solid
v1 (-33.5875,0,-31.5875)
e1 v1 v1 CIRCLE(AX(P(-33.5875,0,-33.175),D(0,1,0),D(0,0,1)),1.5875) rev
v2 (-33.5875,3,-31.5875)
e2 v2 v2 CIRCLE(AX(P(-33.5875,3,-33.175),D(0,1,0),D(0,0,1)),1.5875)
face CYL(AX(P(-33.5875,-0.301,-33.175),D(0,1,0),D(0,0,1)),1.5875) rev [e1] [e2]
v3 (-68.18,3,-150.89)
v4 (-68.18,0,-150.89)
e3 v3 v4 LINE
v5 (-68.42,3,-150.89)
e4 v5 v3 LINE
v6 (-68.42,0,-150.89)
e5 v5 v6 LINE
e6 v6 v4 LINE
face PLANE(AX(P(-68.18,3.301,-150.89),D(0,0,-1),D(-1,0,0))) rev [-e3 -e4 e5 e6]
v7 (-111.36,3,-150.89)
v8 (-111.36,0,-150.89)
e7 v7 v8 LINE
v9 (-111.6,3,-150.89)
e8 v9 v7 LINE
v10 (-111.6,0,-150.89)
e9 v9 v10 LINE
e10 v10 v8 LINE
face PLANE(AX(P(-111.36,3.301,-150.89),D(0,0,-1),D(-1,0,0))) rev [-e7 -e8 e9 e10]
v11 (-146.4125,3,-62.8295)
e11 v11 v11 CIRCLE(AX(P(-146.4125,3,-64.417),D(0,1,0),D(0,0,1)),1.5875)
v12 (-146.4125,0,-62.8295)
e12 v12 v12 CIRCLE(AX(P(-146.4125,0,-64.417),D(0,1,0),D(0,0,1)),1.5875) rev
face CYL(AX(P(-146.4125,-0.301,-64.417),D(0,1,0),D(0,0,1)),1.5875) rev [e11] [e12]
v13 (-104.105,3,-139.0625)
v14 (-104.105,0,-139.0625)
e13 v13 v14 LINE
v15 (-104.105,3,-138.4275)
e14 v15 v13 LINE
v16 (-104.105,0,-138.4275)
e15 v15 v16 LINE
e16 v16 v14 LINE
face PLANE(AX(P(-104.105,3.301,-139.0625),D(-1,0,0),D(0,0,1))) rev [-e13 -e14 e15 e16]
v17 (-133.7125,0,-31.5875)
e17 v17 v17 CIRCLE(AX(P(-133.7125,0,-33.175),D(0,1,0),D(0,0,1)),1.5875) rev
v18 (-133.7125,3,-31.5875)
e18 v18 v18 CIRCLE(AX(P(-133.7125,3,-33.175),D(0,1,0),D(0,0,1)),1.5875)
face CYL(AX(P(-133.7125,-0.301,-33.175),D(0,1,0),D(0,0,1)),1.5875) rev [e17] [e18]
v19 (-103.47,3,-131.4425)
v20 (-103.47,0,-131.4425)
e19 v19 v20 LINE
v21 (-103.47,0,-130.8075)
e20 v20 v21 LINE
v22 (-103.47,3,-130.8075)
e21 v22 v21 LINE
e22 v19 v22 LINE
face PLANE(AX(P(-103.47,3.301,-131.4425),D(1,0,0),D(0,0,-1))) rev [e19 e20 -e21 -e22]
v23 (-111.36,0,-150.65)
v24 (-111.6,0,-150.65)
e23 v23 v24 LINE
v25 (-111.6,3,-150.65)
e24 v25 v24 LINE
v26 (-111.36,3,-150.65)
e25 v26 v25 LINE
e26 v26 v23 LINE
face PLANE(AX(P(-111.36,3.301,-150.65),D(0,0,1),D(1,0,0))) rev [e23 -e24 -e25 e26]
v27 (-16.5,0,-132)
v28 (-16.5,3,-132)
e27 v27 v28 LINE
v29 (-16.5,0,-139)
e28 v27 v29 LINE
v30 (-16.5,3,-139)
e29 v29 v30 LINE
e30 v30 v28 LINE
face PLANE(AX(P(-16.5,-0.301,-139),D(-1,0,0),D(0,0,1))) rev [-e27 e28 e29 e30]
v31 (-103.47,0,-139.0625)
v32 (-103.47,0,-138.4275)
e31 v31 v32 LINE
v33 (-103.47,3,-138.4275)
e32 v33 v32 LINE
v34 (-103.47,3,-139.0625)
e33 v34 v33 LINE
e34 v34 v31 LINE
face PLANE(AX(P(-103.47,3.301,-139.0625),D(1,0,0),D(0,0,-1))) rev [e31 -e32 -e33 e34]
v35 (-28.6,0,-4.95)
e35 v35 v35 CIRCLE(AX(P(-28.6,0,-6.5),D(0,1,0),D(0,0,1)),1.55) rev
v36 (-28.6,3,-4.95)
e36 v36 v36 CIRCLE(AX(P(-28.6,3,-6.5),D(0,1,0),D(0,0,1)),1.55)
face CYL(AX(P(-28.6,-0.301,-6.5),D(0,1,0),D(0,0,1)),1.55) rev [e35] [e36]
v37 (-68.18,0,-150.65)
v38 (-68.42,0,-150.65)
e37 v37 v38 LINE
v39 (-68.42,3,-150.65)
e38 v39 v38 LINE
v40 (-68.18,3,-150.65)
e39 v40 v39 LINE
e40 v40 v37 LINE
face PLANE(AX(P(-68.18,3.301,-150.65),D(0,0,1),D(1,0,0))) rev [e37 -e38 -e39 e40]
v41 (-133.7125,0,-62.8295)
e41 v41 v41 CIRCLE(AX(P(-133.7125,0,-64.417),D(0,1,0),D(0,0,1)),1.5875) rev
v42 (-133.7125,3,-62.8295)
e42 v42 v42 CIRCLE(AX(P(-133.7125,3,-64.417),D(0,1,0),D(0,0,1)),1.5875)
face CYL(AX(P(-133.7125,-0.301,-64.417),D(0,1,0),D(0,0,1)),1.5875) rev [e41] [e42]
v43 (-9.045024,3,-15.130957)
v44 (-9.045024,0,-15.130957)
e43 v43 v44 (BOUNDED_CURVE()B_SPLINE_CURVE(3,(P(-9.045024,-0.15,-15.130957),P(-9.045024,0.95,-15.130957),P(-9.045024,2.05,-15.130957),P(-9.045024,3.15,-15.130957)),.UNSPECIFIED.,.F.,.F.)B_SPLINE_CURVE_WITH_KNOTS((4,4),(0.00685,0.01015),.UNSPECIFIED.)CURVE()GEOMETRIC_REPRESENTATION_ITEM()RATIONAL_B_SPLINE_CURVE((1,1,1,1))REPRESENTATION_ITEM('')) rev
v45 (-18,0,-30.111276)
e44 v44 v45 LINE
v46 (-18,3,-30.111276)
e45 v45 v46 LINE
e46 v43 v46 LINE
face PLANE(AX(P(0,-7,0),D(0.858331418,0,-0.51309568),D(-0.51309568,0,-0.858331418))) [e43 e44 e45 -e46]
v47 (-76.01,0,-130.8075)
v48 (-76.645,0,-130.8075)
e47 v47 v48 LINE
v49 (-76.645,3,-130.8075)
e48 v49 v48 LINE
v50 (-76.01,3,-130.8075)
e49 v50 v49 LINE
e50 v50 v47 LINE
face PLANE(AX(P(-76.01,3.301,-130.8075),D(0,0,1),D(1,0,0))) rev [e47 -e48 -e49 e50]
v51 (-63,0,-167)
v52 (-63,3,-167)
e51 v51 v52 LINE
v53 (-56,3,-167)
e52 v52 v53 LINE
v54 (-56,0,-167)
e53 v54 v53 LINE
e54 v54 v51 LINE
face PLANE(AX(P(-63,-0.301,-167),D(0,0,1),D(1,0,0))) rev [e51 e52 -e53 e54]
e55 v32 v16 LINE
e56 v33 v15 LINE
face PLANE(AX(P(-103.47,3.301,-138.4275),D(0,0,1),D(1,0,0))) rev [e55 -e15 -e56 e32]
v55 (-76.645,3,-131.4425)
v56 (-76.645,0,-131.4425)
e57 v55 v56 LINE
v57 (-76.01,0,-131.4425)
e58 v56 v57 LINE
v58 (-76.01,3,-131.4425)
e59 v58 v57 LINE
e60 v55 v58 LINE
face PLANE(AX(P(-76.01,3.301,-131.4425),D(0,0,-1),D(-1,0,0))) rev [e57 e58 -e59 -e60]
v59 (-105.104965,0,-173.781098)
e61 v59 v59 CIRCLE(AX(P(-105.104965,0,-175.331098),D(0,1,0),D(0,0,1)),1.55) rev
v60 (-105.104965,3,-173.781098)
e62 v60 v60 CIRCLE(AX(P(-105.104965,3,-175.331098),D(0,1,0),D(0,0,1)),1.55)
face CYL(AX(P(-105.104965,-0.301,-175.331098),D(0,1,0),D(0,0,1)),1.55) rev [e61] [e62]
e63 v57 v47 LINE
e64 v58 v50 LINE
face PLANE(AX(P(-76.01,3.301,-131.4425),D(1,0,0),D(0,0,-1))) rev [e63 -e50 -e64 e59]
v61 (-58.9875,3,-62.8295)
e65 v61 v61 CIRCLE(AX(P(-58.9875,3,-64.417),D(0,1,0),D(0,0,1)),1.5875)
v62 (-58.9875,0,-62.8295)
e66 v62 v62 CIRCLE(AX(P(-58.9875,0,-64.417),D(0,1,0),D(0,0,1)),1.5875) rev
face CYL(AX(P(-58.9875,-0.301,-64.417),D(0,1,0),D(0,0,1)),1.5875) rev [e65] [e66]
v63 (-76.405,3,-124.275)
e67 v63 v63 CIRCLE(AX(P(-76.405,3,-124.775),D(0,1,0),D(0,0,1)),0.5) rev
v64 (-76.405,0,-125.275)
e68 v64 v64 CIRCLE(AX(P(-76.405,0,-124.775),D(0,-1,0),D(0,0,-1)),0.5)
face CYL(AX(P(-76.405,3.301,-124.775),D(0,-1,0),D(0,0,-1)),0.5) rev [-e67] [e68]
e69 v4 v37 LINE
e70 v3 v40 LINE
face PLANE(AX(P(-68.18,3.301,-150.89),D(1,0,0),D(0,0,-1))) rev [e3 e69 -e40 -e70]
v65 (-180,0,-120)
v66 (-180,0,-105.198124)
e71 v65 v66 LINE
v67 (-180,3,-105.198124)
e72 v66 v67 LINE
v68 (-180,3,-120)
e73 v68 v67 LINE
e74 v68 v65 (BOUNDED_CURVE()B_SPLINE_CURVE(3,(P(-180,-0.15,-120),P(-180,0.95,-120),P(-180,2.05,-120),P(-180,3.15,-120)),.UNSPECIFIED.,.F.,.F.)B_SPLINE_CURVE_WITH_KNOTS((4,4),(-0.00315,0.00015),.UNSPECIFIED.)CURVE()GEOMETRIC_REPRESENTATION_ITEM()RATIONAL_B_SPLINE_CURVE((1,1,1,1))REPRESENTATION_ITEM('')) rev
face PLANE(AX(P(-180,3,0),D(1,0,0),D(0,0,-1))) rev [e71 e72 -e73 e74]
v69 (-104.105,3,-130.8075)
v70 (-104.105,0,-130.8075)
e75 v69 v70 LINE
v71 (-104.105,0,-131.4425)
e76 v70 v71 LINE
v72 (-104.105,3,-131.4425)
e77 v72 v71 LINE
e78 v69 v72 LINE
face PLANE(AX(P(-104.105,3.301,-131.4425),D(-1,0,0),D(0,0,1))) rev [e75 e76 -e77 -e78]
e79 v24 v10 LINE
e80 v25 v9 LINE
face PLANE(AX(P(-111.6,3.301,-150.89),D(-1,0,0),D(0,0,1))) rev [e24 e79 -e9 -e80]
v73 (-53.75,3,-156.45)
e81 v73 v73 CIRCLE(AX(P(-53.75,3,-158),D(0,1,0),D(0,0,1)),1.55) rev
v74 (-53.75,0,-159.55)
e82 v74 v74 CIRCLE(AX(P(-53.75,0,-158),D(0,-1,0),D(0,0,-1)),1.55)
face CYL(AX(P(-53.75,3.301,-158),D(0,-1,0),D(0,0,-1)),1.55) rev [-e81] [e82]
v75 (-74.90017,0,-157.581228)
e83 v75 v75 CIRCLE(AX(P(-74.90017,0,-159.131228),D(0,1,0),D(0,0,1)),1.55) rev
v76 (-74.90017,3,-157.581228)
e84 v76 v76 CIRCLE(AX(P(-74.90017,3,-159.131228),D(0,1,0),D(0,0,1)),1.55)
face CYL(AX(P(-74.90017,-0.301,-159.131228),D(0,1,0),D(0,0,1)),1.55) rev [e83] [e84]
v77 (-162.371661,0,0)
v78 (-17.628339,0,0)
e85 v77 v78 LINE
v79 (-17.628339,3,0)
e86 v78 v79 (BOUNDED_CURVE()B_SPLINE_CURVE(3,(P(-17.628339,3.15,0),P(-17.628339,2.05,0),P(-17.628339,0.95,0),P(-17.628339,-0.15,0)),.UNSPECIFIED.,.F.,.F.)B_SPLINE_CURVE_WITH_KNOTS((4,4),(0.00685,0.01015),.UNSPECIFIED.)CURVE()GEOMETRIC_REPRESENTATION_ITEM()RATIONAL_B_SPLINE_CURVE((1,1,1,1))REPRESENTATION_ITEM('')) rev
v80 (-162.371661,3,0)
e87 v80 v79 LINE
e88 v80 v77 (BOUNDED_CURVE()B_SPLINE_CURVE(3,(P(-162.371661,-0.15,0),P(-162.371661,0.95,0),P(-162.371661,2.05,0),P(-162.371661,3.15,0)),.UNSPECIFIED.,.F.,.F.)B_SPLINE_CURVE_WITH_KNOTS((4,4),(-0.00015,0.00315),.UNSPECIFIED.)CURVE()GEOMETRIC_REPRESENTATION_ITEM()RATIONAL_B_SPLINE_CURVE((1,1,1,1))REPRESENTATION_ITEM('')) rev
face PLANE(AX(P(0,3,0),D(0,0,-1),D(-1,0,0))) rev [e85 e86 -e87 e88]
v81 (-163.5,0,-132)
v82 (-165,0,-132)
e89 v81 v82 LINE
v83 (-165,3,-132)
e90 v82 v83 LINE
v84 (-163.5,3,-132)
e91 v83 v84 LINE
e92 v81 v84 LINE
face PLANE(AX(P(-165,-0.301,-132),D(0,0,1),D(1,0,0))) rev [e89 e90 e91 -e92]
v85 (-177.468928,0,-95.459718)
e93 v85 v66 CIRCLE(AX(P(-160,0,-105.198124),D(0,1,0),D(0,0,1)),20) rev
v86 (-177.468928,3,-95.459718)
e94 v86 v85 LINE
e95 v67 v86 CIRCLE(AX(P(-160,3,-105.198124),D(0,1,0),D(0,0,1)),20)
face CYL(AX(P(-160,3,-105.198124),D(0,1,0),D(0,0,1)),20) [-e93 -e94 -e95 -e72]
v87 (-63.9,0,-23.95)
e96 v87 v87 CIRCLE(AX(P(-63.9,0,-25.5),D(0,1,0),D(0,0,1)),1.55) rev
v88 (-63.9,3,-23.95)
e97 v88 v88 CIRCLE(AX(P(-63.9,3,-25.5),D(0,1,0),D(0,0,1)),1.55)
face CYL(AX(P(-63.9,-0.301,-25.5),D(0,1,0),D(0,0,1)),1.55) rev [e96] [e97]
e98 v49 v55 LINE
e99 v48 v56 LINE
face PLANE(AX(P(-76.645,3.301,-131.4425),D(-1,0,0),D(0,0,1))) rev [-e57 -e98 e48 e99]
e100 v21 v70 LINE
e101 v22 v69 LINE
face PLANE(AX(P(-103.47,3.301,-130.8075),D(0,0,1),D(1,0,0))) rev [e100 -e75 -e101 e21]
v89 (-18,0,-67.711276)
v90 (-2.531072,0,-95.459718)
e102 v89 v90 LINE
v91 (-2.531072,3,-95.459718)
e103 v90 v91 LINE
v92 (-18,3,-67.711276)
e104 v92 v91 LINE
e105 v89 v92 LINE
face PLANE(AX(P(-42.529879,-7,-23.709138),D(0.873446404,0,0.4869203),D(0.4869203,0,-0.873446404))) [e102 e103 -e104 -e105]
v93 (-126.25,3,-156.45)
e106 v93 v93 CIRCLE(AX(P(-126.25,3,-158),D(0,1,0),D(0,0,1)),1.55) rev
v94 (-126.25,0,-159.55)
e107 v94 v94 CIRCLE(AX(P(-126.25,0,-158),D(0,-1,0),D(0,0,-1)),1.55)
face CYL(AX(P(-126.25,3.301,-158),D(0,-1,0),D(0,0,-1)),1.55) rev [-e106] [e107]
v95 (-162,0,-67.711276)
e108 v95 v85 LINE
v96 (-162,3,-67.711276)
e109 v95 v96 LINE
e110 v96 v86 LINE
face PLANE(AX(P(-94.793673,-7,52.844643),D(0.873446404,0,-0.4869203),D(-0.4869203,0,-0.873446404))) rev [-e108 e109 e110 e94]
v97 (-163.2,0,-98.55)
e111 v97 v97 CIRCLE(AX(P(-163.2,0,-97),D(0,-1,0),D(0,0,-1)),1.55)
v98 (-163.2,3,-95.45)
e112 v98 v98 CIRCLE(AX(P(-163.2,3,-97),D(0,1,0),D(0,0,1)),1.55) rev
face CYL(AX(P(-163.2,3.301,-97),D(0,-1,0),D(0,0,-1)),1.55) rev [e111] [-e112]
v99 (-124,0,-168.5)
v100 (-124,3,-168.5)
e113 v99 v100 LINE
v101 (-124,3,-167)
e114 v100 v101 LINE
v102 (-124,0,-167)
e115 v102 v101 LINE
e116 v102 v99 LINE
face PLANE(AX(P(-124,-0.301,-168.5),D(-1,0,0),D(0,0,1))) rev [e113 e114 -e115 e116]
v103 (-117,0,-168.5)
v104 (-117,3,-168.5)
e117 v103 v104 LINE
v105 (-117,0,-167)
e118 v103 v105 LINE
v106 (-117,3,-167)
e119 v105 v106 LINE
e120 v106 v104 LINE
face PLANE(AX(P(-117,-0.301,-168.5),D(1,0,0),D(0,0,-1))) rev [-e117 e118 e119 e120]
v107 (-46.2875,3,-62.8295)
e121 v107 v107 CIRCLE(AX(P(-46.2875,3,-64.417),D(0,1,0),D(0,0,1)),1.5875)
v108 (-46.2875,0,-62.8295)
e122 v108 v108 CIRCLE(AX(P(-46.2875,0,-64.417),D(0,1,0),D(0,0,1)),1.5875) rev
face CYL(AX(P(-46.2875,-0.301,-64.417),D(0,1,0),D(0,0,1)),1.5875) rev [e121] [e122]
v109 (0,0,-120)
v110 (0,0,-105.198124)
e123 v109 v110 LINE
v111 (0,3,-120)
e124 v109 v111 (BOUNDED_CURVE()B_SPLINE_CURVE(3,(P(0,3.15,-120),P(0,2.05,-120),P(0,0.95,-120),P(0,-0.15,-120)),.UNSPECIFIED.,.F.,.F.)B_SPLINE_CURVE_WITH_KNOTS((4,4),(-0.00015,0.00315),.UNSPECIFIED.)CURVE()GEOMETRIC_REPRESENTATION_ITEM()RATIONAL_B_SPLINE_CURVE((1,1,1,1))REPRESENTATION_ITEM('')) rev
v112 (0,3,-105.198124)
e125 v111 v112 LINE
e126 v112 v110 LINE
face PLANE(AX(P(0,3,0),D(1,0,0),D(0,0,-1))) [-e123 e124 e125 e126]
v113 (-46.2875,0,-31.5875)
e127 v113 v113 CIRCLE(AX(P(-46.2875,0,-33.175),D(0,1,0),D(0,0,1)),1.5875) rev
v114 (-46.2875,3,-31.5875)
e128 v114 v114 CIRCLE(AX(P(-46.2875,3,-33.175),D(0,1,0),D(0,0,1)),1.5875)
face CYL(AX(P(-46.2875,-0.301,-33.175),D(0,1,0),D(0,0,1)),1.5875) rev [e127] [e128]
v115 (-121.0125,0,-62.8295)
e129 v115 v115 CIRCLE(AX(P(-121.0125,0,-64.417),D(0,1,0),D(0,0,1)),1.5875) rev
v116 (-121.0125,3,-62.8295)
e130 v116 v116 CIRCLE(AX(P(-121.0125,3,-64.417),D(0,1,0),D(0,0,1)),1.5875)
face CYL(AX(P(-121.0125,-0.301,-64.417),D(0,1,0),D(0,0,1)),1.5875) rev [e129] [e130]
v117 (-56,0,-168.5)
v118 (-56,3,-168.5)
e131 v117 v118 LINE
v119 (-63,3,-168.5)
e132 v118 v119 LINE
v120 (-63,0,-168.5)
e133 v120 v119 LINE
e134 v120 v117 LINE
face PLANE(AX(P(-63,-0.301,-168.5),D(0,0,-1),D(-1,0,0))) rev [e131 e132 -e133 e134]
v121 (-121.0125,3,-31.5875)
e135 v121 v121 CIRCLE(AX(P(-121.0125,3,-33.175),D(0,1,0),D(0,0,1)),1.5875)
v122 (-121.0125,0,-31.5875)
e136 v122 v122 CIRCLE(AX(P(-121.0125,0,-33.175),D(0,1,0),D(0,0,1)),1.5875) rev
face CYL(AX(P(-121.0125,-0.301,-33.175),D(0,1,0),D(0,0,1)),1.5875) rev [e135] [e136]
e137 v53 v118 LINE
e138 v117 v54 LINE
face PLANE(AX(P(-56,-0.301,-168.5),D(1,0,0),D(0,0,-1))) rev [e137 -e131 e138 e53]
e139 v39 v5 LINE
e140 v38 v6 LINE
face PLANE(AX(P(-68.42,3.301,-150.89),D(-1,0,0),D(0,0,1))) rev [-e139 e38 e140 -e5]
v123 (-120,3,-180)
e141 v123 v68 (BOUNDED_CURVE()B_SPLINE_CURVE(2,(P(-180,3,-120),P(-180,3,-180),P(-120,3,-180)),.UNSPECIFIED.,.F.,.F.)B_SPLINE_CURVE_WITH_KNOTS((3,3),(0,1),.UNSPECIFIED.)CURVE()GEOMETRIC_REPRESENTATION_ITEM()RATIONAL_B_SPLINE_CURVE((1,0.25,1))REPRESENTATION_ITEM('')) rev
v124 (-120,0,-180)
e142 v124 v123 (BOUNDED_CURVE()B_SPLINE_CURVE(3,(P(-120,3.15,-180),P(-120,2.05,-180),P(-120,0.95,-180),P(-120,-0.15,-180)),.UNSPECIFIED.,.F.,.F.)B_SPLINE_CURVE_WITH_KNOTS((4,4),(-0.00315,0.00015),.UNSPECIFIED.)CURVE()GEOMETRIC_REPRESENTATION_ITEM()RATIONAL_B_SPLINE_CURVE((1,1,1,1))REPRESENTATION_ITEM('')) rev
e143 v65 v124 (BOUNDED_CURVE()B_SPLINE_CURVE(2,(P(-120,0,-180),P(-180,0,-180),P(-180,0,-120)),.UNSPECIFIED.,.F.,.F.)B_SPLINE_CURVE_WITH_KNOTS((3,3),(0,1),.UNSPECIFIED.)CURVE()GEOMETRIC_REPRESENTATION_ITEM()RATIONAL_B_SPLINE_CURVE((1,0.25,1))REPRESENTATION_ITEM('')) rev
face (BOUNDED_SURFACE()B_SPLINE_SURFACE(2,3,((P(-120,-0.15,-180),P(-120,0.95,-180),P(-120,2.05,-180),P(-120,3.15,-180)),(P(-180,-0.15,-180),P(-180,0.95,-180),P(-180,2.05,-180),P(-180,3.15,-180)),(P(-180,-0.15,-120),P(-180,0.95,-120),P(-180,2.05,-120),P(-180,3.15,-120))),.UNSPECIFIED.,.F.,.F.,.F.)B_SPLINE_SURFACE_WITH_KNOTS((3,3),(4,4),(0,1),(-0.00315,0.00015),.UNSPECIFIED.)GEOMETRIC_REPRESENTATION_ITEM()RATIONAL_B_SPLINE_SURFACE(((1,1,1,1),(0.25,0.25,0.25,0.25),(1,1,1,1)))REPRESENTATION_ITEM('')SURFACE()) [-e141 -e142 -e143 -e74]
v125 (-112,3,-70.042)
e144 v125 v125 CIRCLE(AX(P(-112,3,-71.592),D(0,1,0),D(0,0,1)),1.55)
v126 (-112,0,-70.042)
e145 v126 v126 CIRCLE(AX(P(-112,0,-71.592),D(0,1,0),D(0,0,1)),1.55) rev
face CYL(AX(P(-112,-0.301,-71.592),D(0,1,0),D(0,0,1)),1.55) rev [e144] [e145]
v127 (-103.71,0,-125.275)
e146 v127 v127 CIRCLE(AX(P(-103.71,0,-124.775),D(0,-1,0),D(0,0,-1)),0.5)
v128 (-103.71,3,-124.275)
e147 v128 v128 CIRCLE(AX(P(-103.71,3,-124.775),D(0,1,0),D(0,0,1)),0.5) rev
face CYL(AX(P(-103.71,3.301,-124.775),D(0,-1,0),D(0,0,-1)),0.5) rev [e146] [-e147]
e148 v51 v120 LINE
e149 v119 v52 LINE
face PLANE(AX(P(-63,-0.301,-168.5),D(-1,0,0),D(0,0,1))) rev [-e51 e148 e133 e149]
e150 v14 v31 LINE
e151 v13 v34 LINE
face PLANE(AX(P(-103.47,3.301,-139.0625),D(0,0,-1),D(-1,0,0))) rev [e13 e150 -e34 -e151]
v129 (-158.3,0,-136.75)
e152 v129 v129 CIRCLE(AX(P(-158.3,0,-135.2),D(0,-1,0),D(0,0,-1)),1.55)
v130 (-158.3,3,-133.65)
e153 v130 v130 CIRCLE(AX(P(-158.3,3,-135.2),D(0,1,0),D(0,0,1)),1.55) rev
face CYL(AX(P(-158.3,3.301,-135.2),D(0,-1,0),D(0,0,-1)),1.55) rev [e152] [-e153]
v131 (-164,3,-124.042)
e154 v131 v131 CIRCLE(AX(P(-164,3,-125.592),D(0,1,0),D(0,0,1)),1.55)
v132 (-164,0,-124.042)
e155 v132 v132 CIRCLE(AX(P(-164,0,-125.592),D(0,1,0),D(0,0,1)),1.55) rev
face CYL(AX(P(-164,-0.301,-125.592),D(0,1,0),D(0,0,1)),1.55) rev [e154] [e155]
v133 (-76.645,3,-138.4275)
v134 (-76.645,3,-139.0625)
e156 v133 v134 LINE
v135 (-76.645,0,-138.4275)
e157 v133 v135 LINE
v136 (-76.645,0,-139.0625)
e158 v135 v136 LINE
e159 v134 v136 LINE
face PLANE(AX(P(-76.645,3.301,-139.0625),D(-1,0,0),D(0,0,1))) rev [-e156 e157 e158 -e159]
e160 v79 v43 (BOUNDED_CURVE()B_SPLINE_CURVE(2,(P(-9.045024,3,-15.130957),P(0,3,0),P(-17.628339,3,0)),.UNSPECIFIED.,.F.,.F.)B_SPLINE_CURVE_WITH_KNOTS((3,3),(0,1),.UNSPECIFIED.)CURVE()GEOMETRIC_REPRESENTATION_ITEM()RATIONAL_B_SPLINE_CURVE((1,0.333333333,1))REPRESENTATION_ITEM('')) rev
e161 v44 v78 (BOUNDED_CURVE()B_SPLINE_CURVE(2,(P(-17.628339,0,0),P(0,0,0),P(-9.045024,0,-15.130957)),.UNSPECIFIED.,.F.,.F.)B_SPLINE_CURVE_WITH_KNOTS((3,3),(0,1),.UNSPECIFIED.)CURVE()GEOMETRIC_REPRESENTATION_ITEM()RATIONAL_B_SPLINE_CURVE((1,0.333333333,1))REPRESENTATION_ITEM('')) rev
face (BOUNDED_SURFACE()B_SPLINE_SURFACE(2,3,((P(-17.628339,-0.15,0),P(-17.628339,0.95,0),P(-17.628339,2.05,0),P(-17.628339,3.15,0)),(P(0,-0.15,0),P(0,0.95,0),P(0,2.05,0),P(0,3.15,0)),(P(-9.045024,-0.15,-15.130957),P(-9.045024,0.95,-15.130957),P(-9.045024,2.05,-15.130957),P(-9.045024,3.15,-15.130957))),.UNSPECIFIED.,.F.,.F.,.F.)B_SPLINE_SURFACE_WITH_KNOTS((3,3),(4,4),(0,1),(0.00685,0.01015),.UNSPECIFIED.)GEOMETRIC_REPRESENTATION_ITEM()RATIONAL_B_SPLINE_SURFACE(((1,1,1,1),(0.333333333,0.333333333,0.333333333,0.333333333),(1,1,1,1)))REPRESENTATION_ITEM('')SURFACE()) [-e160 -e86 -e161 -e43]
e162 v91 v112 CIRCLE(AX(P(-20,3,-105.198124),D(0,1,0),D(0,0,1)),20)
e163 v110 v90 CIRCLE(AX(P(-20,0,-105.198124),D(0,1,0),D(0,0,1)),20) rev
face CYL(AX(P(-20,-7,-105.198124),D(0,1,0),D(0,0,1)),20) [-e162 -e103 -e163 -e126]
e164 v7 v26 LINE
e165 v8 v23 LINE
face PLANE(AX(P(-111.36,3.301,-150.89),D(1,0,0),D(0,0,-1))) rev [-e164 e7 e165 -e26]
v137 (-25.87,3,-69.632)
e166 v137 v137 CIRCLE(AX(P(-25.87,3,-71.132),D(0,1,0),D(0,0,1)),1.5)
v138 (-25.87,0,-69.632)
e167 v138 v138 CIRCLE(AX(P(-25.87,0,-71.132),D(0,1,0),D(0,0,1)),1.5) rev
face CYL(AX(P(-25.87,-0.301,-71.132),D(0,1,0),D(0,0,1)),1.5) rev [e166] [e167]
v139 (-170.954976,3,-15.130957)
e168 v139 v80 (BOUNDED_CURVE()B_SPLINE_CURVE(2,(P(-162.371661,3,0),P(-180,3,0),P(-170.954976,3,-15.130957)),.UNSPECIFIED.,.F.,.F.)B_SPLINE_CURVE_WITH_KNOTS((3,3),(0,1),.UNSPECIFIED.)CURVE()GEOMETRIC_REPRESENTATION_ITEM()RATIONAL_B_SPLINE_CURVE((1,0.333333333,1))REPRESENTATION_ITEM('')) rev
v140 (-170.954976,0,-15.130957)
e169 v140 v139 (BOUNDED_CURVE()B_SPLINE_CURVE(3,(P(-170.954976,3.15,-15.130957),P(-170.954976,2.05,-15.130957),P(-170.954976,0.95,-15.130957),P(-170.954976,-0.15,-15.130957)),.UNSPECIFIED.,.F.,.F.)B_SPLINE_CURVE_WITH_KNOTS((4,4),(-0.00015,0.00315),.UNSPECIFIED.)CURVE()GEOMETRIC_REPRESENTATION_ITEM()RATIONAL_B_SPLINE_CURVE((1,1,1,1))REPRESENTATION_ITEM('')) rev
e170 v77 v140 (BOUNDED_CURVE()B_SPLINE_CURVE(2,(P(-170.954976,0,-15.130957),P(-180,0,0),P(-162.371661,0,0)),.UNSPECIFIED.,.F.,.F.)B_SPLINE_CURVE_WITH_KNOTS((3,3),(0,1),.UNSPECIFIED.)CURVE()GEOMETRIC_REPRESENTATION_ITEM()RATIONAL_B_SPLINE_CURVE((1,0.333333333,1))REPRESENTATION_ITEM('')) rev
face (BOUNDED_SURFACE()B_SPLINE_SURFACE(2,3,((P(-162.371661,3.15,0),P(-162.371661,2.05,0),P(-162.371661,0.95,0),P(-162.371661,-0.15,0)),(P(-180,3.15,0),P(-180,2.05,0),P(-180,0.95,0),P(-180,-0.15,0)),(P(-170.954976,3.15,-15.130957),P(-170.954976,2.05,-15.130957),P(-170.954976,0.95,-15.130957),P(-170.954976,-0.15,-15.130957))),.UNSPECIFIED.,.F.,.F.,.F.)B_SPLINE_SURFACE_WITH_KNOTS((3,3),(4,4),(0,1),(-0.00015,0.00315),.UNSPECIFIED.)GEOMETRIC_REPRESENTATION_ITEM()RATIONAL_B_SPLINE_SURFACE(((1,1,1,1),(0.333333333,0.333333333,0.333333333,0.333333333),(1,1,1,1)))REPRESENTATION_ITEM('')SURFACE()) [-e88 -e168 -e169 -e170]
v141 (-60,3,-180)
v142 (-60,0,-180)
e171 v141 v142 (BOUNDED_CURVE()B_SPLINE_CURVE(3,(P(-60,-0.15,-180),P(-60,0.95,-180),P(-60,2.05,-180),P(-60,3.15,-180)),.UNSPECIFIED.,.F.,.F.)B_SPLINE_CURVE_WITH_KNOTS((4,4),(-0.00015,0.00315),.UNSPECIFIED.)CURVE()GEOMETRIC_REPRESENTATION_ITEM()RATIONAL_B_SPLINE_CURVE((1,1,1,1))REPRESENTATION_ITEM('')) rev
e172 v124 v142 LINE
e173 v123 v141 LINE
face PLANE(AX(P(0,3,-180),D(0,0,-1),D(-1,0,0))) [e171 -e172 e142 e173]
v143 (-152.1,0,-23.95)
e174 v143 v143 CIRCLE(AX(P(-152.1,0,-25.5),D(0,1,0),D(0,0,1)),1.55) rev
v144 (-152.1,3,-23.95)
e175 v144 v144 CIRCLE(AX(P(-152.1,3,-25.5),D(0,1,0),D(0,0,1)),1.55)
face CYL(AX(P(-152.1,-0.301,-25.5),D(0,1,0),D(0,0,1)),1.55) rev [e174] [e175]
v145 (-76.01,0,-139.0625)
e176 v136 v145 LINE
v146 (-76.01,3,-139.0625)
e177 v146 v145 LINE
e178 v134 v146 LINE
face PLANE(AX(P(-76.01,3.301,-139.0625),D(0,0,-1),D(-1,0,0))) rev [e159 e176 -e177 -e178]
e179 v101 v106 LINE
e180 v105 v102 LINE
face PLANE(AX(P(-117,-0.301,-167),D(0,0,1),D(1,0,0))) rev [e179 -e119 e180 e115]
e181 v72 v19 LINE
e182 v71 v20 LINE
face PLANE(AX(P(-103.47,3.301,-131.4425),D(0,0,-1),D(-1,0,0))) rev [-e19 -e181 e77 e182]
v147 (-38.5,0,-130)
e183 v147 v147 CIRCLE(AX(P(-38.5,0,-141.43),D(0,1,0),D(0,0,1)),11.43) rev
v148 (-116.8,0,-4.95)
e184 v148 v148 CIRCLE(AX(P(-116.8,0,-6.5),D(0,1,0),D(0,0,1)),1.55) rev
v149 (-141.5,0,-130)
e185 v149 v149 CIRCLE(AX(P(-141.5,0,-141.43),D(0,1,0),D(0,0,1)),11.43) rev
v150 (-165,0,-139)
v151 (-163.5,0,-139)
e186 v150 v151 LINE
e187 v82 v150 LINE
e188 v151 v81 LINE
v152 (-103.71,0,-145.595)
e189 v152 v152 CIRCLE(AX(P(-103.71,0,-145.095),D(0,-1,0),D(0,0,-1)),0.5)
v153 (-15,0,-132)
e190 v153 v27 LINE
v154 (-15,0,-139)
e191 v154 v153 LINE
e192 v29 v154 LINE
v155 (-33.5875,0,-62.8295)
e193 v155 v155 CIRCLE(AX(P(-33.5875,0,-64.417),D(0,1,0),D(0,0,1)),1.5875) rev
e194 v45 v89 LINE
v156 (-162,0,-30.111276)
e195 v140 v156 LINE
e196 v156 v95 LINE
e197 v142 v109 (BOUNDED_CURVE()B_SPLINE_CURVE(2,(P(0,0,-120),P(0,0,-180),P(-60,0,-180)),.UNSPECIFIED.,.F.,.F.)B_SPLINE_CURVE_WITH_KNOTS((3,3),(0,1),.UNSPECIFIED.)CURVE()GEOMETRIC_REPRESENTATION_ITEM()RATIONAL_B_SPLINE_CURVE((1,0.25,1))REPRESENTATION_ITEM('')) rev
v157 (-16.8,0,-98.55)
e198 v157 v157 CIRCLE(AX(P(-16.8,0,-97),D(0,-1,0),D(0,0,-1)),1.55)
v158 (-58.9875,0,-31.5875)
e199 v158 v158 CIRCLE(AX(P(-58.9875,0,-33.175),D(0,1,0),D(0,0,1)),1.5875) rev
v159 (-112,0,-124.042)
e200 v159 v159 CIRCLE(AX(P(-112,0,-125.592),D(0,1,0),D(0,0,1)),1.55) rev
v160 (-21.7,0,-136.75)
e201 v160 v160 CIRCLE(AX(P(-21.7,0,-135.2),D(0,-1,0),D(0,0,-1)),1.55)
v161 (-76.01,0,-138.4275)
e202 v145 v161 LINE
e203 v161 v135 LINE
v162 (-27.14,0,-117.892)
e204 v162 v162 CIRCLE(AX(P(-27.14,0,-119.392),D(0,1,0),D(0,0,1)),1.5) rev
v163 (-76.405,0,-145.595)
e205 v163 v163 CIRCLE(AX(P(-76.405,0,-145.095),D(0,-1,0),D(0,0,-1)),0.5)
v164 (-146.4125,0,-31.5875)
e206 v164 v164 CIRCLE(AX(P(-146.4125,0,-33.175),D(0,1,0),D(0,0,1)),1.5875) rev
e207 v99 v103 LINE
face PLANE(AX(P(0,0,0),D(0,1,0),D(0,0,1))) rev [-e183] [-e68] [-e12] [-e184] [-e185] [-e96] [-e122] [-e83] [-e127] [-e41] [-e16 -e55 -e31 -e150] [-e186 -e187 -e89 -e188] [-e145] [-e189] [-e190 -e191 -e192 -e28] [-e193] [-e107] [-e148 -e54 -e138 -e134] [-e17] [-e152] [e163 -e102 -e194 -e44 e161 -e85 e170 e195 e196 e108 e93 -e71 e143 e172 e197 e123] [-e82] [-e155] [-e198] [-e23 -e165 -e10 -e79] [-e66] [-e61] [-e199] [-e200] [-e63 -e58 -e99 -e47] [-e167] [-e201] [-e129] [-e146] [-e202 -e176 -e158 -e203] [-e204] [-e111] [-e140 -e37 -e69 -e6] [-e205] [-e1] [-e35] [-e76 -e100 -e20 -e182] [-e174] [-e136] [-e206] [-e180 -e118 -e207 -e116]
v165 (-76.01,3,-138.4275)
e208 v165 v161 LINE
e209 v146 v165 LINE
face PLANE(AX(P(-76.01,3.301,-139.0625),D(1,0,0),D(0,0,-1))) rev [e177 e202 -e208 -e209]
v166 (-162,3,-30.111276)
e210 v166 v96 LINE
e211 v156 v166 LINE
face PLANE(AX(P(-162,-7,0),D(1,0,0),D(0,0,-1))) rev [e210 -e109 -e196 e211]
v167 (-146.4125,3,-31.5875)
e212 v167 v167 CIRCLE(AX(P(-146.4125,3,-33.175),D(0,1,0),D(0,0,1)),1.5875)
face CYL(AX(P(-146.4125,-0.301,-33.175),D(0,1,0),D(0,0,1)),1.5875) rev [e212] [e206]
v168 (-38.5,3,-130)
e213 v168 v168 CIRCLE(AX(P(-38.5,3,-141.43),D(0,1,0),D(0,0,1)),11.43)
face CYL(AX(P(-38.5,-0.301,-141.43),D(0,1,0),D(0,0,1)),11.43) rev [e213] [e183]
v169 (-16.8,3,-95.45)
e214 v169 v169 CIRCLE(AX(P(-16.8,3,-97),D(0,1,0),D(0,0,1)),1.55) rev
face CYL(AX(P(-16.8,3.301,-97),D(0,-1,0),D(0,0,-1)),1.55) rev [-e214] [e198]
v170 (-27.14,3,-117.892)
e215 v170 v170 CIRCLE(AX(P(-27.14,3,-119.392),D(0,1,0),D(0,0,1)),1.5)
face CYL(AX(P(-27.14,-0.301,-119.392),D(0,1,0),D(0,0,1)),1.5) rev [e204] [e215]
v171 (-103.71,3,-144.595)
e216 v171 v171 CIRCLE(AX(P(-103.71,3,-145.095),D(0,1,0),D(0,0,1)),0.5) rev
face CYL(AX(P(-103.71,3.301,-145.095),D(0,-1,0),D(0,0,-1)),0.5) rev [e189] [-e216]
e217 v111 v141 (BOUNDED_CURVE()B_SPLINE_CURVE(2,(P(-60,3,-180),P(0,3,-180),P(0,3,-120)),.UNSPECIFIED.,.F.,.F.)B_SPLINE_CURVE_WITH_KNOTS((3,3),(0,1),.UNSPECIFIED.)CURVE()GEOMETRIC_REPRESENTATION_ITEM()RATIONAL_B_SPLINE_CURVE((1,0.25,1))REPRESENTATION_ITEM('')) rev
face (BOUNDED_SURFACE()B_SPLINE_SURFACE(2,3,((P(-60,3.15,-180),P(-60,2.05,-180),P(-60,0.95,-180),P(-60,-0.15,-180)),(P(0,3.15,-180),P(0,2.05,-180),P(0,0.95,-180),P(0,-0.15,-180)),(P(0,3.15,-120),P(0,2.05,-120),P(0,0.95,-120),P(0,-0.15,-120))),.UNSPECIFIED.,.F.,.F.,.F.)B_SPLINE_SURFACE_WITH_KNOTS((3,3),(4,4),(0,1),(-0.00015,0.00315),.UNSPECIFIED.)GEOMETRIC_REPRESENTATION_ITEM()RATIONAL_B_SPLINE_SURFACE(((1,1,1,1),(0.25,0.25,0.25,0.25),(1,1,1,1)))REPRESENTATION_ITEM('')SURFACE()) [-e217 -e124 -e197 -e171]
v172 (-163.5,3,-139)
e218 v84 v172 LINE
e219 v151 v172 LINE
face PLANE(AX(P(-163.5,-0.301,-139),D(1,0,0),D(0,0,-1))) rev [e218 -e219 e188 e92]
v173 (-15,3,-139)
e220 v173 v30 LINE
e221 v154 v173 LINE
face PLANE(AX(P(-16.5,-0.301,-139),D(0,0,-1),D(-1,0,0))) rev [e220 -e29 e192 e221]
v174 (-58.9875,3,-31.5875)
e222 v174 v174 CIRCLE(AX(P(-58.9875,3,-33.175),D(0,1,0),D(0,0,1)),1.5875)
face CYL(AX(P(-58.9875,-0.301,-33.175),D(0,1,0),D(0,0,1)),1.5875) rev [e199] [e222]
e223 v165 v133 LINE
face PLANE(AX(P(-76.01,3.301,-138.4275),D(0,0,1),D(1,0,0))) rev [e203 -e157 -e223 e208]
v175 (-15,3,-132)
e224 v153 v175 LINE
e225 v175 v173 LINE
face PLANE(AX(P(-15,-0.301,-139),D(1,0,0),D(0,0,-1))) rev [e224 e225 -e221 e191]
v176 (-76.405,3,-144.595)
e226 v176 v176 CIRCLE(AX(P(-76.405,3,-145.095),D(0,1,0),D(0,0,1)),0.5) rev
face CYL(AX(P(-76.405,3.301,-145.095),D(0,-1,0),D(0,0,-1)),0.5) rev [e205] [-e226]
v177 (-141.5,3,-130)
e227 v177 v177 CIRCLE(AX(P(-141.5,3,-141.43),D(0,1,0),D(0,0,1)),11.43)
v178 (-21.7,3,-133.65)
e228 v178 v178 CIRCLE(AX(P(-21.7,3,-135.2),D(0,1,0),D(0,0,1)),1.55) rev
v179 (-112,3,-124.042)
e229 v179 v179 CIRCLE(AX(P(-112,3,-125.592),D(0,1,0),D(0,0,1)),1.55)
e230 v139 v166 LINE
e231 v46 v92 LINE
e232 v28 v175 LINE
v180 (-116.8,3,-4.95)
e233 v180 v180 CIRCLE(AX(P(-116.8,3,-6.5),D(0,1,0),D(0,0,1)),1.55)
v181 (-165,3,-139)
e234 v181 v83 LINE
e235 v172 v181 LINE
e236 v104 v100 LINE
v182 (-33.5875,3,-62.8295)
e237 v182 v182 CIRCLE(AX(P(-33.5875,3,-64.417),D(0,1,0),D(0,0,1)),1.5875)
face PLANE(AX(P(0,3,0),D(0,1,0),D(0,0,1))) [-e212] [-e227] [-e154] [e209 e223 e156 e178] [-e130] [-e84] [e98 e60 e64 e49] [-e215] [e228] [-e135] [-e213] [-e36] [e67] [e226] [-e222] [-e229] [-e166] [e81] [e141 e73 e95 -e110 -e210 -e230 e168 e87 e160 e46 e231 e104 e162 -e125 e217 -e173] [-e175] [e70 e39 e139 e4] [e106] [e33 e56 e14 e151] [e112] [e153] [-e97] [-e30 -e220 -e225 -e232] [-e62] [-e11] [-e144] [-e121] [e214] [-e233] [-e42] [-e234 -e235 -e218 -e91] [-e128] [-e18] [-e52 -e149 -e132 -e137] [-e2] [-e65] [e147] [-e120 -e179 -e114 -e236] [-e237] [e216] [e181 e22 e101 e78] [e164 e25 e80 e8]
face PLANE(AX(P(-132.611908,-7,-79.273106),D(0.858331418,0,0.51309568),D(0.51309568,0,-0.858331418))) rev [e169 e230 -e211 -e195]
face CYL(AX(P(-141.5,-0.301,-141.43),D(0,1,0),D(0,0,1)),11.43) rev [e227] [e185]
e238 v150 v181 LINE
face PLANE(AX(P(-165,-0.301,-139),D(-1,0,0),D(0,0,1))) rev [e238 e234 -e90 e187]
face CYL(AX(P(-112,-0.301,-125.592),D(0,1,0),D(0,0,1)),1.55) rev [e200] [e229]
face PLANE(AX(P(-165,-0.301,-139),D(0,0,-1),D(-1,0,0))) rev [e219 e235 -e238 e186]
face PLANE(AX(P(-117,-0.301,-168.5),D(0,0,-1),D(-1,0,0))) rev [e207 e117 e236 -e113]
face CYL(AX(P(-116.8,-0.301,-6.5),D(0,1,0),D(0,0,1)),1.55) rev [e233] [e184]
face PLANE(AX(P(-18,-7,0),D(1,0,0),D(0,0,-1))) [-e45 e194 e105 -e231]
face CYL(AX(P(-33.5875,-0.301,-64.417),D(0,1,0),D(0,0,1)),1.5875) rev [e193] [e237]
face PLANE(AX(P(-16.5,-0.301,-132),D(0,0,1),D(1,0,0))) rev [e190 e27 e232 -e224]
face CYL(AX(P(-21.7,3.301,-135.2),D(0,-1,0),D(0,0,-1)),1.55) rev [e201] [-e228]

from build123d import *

# Parameters (mm, degrees)
SKETCH1_W           = 80
SKETCH1_H           = 30
SKETCH1_W_2         = 50
BOSS_EXTRUDE1_DEPTH = 3
FILLET1_SIZE        = 60
SKETCH6_W           = 80
SKETCH6_H           = 30
CUT_EXTRUDE1_DEPTH  = 10
FILLET3_R           = 20
SKETCH8_R           = 1.55
SKETCH8_R_2         = 11.43
SKETCH8_R_3         = 1.5875
SKETCH8_R_4         = 1.5
SKETCH8_W           = 7
SKETCH8_H           = 1.5
SKETCH8_W_2         = 1.5
SKETCH8_H_2         = 7
CUT_EXTRUDE2_DEPTH  = 3
CUT_EXTRUDE3_REACH  = 256.576
SKETCH9_R           = 1.55
SKETCH9_R_2         = 0.5
SKETCH9_W           = 0.24
SKETCH9_H           = 0.24
SKETCH9_W_2         = 0.635
SKETCH9_H_2         = 0.635


with BuildPart() as part:
    # Sketch1 → Boss-Extrude1 (new body)
    with BuildSketch(Plane(origin=(0, 0, 0), x_dir=(1, 0, 0), z_dir=(0, 1, 0))):
        with Locations((-90, -15)):
            Rectangle(SKETCH1_W, SKETCH1_H)
        Polygon((0, 180), (-180, 180), (-180, 30), (-130, 30), (-50, 30), (0, 30), align=None)
        with Locations((-25, 15)):
            Rectangle(SKETCH1_W_2, SKETCH1_H)
        with Locations((-155, 15)):
            Rectangle(SKETCH1_W_2, SKETCH1_H)
        with Locations((-90, 15)):
            Rectangle(SKETCH1_W, SKETCH1_H)
    extrude(amount=BOSS_EXTRUDE1_DEPTH)

    # Fillet1
    # a fillet whose section is not a circle: 60 mm, written as the material it takes off along each edge
    with BuildSketch(Plane(origin=(0, -150, -180), x_dir=(0, 0, 1), z_dir=(0, 1, 0)), Plane(origin=(-180, -150, -180), x_dir=(1, 0, 0), z_dir=(0, 1, 0))) as fillet1_piece_1:
        with BuildLine():
            Bezier((FILLET1_SIZE, 0), (0, 0), (0, -FILLET1_SIZE), weights=[1, 0.25, 1])
            Line((0, -FILLET1_SIZE), (0, 0))
            Line((0, 0), (FILLET1_SIZE, 0))
        make_face()
    extrude(amount=303, mode=Mode.SUBTRACT)

    # Sketch6 → Cut-Extrude1 (cut)
    with BuildSketch(Plane(origin=(0, 3, 0), x_dir=(1, 0, 0), z_dir=(0, 1, 0))):
        with Locations((-90, -15)):
            Rectangle(SKETCH6_W, SKETCH6_H)
        Polygon((-180, 100), (-180, 0), (-162, 30.1112758), (-162, 67.7112758), align=None)
        Polygon((-18, 30.1112758), (0, 0), (0, 100), (-18, 67.7112758), align=None)
    extrude(amount=-CUT_EXTRUDE1_DEPTH, mode=Mode.SUBTRACT)

    # Fillet2
    # a fillet whose section is not a circle: 10 mm, written as the material it takes off along each edge
    with BuildSketch(Plane(origin=(-180, -44.070846291, 0), x_dir=(1, 0, 0), z_dir=(0, 1, 0)), Plane(origin=(0, -44.070846291, 0), x_dir=(-0.513095679808488, 0, -0.8583314181374613), z_dir=(0, 1, 0))) as fillet2_piece_1:
        with BuildLine():
            Bezier((17.628338516, 0), (0, 0), (9.045024335, 15.130956798), weights=[1, 0.333333333, 1])
            Line((9.045024335, 15.130956798), (0, 0))
            Line((0, 0), (17.628338516, 0))
        make_face()
    extrude(amount=91.141692581, mode=Mode.SUBTRACT)

    # Fillet3
    fillet3_edges = [part.edges().sort_by_distance(p)[0] for p in [
        (0, 1.5, -100),
        (-180, 1.5, -100),
    ]]
    fillet(fillet3_edges, radius=FILLET3_R)

    # Sketch8 → Cut-Extrude2 (cut)
    with BuildSketch(Plane(origin=(0, 3, 0), x_dir=(1, 0, 0), z_dir=(0, 1, 0))):
        with Locations(Location((-105.104964584, 175.33109831, 0), (0, 0, 270))):
            Circle(SKETCH8_R)
        with Locations(Location((-74.900170028, 159.13122779, 0), (0, 0, 270))):
            Circle(SKETCH8_R)
        with Locations(Location((-141.5, 141.43, 0), (0, 0, 270))):
            Circle(SKETCH8_R_2)
        with Locations(Location((-38.5, 141.43, 0), (0, 0, 270))):
            Circle(SKETCH8_R_2)
        with Locations(Location((-112, 125.592, 0), (0, 0, 270))):
            Circle(SKETCH8_R)
        with Locations(Location((-164, 125.592, 0), (0, 0, 270))):
            Circle(SKETCH8_R)
        with Locations(Location((-112, 71.592, 0), (0, 0, 270))):
            Circle(SKETCH8_R)
        with Locations(Location((-146.4125, 64.417, 0), (0, 0, 270))):
            Circle(SKETCH8_R_3)
        with Locations(Location((-133.7125, 64.417, 0), (0, 0, 270))):
            Circle(SKETCH8_R_3)
        with Locations(Location((-121.0125, 64.417, 0), (0, 0, 270))):
            Circle(SKETCH8_R_3)
        with Locations(Location((-146.4125, 33.175, 0), (0, 0, 270))):
            Circle(SKETCH8_R_3)
        with Locations(Location((-133.7125, 33.175, 0), (0, 0, 270))):
            Circle(SKETCH8_R_3)
        with Locations(Location((-121.0125, 33.175, 0), (0, 0, 270))):
            Circle(SKETCH8_R_3)
        with Locations(Location((-58.9875, 64.417, 0), (0, 0, 270))):
            Circle(SKETCH8_R_3)
        with Locations(Location((-46.2875, 64.417, 0), (0, 0, 270))):
            Circle(SKETCH8_R_3)
        with Locations(Location((-33.5875, 64.417, 0), (0, 0, 270))):
            Circle(SKETCH8_R_3)
        with Locations(Location((-33.5875, 33.175, 0), (0, 0, 270))):
            Circle(SKETCH8_R_3)
        with Locations(Location((-46.2875, 33.175, 0), (0, 0, 270))):
            Circle(SKETCH8_R_3)
        with Locations(Location((-58.9875, 33.175, 0), (0, 0, 270))):
            Circle(SKETCH8_R_3)
        with Locations(Location((-63.9, 25.5, 0), (0, 0, 270))):
            Circle(SKETCH8_R)
        with Locations(Location((-28.6, 6.5, 0), (0, 0, 270))):
            Circle(SKETCH8_R)
        with Locations(Location((-116.8, 6.5, 0), (0, 0, 270))):
            Circle(SKETCH8_R)
        with Locations(Location((-152.1, 25.5, 0), (0, 0, 270))):
            Circle(SKETCH8_R)
        with Locations(Location((-27.14, 119.392, 0), (0, 0, 270))):
            Circle(SKETCH8_R_4)
        with Locations(Location((-25.87, 71.132, 0), (0, 0, 270))):
            Circle(SKETCH8_R_4)
        with Locations((-59.5, 167.75)):
            Rectangle(SKETCH8_W, SKETCH8_H)
        with Locations((-120.5, 167.75)):
            Rectangle(SKETCH8_W, SKETCH8_H)
        with Locations((-164.25, 135.5)):
            Rectangle(SKETCH8_W_2, SKETCH8_H_2)
        with Locations((-15.75, 135.5)):
            Rectangle(SKETCH8_W_2, SKETCH8_H_2)
    extrude(amount=-CUT_EXTRUDE2_DEPTH, mode=Mode.SUBTRACT)

    # Sketch9 → Cut-Extrude3 (cut, up to next)
    with BuildSketch(Plane.XZ, mode=Mode.PRIVATE) as cut_extrude3_sk1:
        with Locations(Location((-163.2, -97, 0), (0, 0, 270))):
            Circle(SKETCH9_R)
    cut_extrude3_tool1 = extrude(cut_extrude3_sk1.sketch, amount=-CUT_EXTRUDE3_REACH, mode=Mode.PRIVATE) & part.part
    # Sketch9 → Cut-Extrude3 (cut, up to next)
    with BuildSketch(Plane.XZ, mode=Mode.PRIVATE) as cut_extrude3_sk2:
        with Locations(Location((-158.3, -135.2, 0), (0, 0, 270))):
            Circle(SKETCH9_R)
    cut_extrude3_tool2 = extrude(cut_extrude3_sk2.sketch, amount=-CUT_EXTRUDE3_REACH, mode=Mode.PRIVATE) & part.part
    # Sketch9 → Cut-Extrude3 (cut, up to next)
    with BuildSketch(Plane.XZ, mode=Mode.PRIVATE) as cut_extrude3_sk3:
        with Locations(Location((-126.25, -158, 0), (0, 0, 270))):
            Circle(SKETCH9_R)
    cut_extrude3_tool3 = extrude(cut_extrude3_sk3.sketch, amount=-CUT_EXTRUDE3_REACH, mode=Mode.PRIVATE) & part.part
    # Sketch9 → Cut-Extrude3 (cut, up to next)
    with BuildSketch(Plane.XZ, mode=Mode.PRIVATE) as cut_extrude3_sk4:
        with Locations(Location((-53.75, -158, 0), (0, 0, 270))):
            Circle(SKETCH9_R)
    cut_extrude3_tool4 = extrude(cut_extrude3_sk4.sketch, amount=-CUT_EXTRUDE3_REACH, mode=Mode.PRIVATE) & part.part
    # Sketch9 → Cut-Extrude3 (cut, up to next)
    with BuildSketch(Plane.XZ, mode=Mode.PRIVATE) as cut_extrude3_sk5:
        with Locations(Location((-21.7, -135.2, 0), (0, 0, 270))):
            Circle(SKETCH9_R)
    cut_extrude3_tool5 = extrude(cut_extrude3_sk5.sketch, amount=-CUT_EXTRUDE3_REACH, mode=Mode.PRIVATE) & part.part
    # Sketch9 → Cut-Extrude3 (cut, up to next)
    with BuildSketch(Plane.XZ, mode=Mode.PRIVATE) as cut_extrude3_sk6:
        with Locations(Location((-16.8, -97, 0), (0, 0, 270))):
            Circle(SKETCH9_R)
    cut_extrude3_tool6 = extrude(cut_extrude3_sk6.sketch, amount=-CUT_EXTRUDE3_REACH, mode=Mode.PRIVATE) & part.part
    # Sketch9 → Cut-Extrude3 (cut, up to next)
    with BuildSketch(Plane.XZ, mode=Mode.PRIVATE) as cut_extrude3_sk7:
        with Locations(Location((-76.405, -124.775, 0), (0, 0, 270))):
            Circle(SKETCH9_R_2)
    cut_extrude3_tool7 = extrude(cut_extrude3_sk7.sketch, amount=-CUT_EXTRUDE3_REACH, mode=Mode.PRIVATE) & part.part
    # Sketch9 → Cut-Extrude3 (cut, up to next)
    with BuildSketch(Plane.XZ, mode=Mode.PRIVATE) as cut_extrude3_sk8:
        with Locations(Location((-103.71, -145.095, 0), (0, 0, 270))):
            Circle(SKETCH9_R_2)
    cut_extrude3_tool8 = extrude(cut_extrude3_sk8.sketch, amount=-CUT_EXTRUDE3_REACH, mode=Mode.PRIVATE) & part.part
    # Sketch9 → Cut-Extrude3 (cut, up to next)
    with BuildSketch(Plane.XZ, mode=Mode.PRIVATE) as cut_extrude3_sk9:
        with Locations(Location((-76.405, -145.095, 0), (0, 0, 270))):
            Circle(SKETCH9_R_2)
    cut_extrude3_tool9 = extrude(cut_extrude3_sk9.sketch, amount=-CUT_EXTRUDE3_REACH, mode=Mode.PRIVATE) & part.part
    # Sketch9 → Cut-Extrude3 (cut, up to next)
    with BuildSketch(Plane.XZ, mode=Mode.PRIVATE) as cut_extrude3_sk10:
        with Locations(Location((-103.71, -124.775, 0), (0, 0, 270))):
            Circle(SKETCH9_R_2)
    cut_extrude3_tool10 = extrude(cut_extrude3_sk10.sketch, amount=-CUT_EXTRUDE3_REACH, mode=Mode.PRIVATE) & part.part
    # Sketch9 → Cut-Extrude3 (cut, up to next)
    with BuildSketch(Plane.XZ, mode=Mode.PRIVATE) as cut_extrude3_sk11:
        with Locations((-68.3, -150.77)):
            Rectangle(SKETCH9_W, SKETCH9_H)
    cut_extrude3_tool11 = extrude(cut_extrude3_sk11.sketch, amount=-CUT_EXTRUDE3_REACH, mode=Mode.PRIVATE) & part.part
    # Sketch9 → Cut-Extrude3 (cut, up to next)
    with BuildSketch(Plane.XZ, mode=Mode.PRIVATE) as cut_extrude3_sk12:
        with Locations((-111.48, -150.77)):
            Rectangle(SKETCH9_W, SKETCH9_H)
    cut_extrude3_tool12 = extrude(cut_extrude3_sk12.sketch, amount=-CUT_EXTRUDE3_REACH, mode=Mode.PRIVATE) & part.part
    # Sketch9 → Cut-Extrude3 (cut, up to next)
    with BuildSketch(Plane.XZ, mode=Mode.PRIVATE) as cut_extrude3_sk13:
        with Locations((-76.3275, -138.745)):
            Rectangle(SKETCH9_W_2, SKETCH9_H_2)
    cut_extrude3_tool13 = extrude(cut_extrude3_sk13.sketch, amount=-CUT_EXTRUDE3_REACH, mode=Mode.PRIVATE) & part.part
    # Sketch9 → Cut-Extrude3 (cut, up to next)
    with BuildSketch(Plane.XZ, mode=Mode.PRIVATE) as cut_extrude3_sk14:
        with Locations((-76.3275, -131.125)):
            Rectangle(SKETCH9_W_2, SKETCH9_H_2)
    cut_extrude3_tool14 = extrude(cut_extrude3_sk14.sketch, amount=-CUT_EXTRUDE3_REACH, mode=Mode.PRIVATE) & part.part
    # Sketch9 → Cut-Extrude3 (cut, up to next)
    with BuildSketch(Plane.XZ, mode=Mode.PRIVATE) as cut_extrude3_sk15:
        with Locations((-103.7875, -138.745)):
            Rectangle(SKETCH9_W_2, SKETCH9_H_2)
    cut_extrude3_tool15 = extrude(cut_extrude3_sk15.sketch, amount=-CUT_EXTRUDE3_REACH, mode=Mode.PRIVATE) & part.part
    # Sketch9 → Cut-Extrude3 (cut, up to next)
    with BuildSketch(Plane.XZ, mode=Mode.PRIVATE) as cut_extrude3_sk16:
        with Locations((-103.7875, -131.125)):
            Rectangle(SKETCH9_W_2, SKETCH9_H_2)
    cut_extrude3_tool16 = extrude(cut_extrude3_sk16.sketch, amount=-CUT_EXTRUDE3_REACH, mode=Mode.PRIVATE) & part.part
    add(cut_extrude3_tool1.solids().sort_by_distance((-163.2, 0, -97))[0], mode=Mode.SUBTRACT)
    add(cut_extrude3_tool2.solids().sort_by_distance((-158.3, 0, -135.2))[0], mode=Mode.SUBTRACT)
    add(cut_extrude3_tool3.solids().sort_by_distance((-126.25, 0, -158))[0], mode=Mode.SUBTRACT)
    add(cut_extrude3_tool4.solids().sort_by_distance((-53.75, 0, -158))[0], mode=Mode.SUBTRACT)
    add(cut_extrude3_tool5.solids().sort_by_distance((-21.7, 0, -135.2))[0], mode=Mode.SUBTRACT)
    add(cut_extrude3_tool6.solids().sort_by_distance((-16.8, 0, -97))[0], mode=Mode.SUBTRACT)
    add(cut_extrude3_tool7.solids().sort_by_distance((-76.405, 0, -124.775))[0], mode=Mode.SUBTRACT)
    add(cut_extrude3_tool8.solids().sort_by_distance((-103.71, 0, -145.095))[0], mode=Mode.SUBTRACT)
    add(cut_extrude3_tool9.solids().sort_by_distance((-76.405, 0, -145.095))[0], mode=Mode.SUBTRACT)
    add(cut_extrude3_tool10.solids().sort_by_distance((-103.71, 0, -124.775))[0], mode=Mode.SUBTRACT)
    add(cut_extrude3_tool11.solids().sort_by_distance((-68.3, 0, -150.77))[0], mode=Mode.SUBTRACT)
    add(cut_extrude3_tool12.solids().sort_by_distance((-111.48, 0, -150.77))[0], mode=Mode.SUBTRACT)
    add(cut_extrude3_tool13.solids().sort_by_distance((-76.3275, 0, -138.745))[0], mode=Mode.SUBTRACT)
    add(cut_extrude3_tool14.solids().sort_by_distance((-76.3275, 0, -131.125))[0], mode=Mode.SUBTRACT)
    add(cut_extrude3_tool15.solids().sort_by_distance((-103.7875, 0, -138.745))[0], mode=Mode.SUBTRACT)
    add(cut_extrude3_tool16.solids().sort_by_distance((-103.7875, 0, -131.125))[0], mode=Mode.SUBTRACT)


solid = part.part
